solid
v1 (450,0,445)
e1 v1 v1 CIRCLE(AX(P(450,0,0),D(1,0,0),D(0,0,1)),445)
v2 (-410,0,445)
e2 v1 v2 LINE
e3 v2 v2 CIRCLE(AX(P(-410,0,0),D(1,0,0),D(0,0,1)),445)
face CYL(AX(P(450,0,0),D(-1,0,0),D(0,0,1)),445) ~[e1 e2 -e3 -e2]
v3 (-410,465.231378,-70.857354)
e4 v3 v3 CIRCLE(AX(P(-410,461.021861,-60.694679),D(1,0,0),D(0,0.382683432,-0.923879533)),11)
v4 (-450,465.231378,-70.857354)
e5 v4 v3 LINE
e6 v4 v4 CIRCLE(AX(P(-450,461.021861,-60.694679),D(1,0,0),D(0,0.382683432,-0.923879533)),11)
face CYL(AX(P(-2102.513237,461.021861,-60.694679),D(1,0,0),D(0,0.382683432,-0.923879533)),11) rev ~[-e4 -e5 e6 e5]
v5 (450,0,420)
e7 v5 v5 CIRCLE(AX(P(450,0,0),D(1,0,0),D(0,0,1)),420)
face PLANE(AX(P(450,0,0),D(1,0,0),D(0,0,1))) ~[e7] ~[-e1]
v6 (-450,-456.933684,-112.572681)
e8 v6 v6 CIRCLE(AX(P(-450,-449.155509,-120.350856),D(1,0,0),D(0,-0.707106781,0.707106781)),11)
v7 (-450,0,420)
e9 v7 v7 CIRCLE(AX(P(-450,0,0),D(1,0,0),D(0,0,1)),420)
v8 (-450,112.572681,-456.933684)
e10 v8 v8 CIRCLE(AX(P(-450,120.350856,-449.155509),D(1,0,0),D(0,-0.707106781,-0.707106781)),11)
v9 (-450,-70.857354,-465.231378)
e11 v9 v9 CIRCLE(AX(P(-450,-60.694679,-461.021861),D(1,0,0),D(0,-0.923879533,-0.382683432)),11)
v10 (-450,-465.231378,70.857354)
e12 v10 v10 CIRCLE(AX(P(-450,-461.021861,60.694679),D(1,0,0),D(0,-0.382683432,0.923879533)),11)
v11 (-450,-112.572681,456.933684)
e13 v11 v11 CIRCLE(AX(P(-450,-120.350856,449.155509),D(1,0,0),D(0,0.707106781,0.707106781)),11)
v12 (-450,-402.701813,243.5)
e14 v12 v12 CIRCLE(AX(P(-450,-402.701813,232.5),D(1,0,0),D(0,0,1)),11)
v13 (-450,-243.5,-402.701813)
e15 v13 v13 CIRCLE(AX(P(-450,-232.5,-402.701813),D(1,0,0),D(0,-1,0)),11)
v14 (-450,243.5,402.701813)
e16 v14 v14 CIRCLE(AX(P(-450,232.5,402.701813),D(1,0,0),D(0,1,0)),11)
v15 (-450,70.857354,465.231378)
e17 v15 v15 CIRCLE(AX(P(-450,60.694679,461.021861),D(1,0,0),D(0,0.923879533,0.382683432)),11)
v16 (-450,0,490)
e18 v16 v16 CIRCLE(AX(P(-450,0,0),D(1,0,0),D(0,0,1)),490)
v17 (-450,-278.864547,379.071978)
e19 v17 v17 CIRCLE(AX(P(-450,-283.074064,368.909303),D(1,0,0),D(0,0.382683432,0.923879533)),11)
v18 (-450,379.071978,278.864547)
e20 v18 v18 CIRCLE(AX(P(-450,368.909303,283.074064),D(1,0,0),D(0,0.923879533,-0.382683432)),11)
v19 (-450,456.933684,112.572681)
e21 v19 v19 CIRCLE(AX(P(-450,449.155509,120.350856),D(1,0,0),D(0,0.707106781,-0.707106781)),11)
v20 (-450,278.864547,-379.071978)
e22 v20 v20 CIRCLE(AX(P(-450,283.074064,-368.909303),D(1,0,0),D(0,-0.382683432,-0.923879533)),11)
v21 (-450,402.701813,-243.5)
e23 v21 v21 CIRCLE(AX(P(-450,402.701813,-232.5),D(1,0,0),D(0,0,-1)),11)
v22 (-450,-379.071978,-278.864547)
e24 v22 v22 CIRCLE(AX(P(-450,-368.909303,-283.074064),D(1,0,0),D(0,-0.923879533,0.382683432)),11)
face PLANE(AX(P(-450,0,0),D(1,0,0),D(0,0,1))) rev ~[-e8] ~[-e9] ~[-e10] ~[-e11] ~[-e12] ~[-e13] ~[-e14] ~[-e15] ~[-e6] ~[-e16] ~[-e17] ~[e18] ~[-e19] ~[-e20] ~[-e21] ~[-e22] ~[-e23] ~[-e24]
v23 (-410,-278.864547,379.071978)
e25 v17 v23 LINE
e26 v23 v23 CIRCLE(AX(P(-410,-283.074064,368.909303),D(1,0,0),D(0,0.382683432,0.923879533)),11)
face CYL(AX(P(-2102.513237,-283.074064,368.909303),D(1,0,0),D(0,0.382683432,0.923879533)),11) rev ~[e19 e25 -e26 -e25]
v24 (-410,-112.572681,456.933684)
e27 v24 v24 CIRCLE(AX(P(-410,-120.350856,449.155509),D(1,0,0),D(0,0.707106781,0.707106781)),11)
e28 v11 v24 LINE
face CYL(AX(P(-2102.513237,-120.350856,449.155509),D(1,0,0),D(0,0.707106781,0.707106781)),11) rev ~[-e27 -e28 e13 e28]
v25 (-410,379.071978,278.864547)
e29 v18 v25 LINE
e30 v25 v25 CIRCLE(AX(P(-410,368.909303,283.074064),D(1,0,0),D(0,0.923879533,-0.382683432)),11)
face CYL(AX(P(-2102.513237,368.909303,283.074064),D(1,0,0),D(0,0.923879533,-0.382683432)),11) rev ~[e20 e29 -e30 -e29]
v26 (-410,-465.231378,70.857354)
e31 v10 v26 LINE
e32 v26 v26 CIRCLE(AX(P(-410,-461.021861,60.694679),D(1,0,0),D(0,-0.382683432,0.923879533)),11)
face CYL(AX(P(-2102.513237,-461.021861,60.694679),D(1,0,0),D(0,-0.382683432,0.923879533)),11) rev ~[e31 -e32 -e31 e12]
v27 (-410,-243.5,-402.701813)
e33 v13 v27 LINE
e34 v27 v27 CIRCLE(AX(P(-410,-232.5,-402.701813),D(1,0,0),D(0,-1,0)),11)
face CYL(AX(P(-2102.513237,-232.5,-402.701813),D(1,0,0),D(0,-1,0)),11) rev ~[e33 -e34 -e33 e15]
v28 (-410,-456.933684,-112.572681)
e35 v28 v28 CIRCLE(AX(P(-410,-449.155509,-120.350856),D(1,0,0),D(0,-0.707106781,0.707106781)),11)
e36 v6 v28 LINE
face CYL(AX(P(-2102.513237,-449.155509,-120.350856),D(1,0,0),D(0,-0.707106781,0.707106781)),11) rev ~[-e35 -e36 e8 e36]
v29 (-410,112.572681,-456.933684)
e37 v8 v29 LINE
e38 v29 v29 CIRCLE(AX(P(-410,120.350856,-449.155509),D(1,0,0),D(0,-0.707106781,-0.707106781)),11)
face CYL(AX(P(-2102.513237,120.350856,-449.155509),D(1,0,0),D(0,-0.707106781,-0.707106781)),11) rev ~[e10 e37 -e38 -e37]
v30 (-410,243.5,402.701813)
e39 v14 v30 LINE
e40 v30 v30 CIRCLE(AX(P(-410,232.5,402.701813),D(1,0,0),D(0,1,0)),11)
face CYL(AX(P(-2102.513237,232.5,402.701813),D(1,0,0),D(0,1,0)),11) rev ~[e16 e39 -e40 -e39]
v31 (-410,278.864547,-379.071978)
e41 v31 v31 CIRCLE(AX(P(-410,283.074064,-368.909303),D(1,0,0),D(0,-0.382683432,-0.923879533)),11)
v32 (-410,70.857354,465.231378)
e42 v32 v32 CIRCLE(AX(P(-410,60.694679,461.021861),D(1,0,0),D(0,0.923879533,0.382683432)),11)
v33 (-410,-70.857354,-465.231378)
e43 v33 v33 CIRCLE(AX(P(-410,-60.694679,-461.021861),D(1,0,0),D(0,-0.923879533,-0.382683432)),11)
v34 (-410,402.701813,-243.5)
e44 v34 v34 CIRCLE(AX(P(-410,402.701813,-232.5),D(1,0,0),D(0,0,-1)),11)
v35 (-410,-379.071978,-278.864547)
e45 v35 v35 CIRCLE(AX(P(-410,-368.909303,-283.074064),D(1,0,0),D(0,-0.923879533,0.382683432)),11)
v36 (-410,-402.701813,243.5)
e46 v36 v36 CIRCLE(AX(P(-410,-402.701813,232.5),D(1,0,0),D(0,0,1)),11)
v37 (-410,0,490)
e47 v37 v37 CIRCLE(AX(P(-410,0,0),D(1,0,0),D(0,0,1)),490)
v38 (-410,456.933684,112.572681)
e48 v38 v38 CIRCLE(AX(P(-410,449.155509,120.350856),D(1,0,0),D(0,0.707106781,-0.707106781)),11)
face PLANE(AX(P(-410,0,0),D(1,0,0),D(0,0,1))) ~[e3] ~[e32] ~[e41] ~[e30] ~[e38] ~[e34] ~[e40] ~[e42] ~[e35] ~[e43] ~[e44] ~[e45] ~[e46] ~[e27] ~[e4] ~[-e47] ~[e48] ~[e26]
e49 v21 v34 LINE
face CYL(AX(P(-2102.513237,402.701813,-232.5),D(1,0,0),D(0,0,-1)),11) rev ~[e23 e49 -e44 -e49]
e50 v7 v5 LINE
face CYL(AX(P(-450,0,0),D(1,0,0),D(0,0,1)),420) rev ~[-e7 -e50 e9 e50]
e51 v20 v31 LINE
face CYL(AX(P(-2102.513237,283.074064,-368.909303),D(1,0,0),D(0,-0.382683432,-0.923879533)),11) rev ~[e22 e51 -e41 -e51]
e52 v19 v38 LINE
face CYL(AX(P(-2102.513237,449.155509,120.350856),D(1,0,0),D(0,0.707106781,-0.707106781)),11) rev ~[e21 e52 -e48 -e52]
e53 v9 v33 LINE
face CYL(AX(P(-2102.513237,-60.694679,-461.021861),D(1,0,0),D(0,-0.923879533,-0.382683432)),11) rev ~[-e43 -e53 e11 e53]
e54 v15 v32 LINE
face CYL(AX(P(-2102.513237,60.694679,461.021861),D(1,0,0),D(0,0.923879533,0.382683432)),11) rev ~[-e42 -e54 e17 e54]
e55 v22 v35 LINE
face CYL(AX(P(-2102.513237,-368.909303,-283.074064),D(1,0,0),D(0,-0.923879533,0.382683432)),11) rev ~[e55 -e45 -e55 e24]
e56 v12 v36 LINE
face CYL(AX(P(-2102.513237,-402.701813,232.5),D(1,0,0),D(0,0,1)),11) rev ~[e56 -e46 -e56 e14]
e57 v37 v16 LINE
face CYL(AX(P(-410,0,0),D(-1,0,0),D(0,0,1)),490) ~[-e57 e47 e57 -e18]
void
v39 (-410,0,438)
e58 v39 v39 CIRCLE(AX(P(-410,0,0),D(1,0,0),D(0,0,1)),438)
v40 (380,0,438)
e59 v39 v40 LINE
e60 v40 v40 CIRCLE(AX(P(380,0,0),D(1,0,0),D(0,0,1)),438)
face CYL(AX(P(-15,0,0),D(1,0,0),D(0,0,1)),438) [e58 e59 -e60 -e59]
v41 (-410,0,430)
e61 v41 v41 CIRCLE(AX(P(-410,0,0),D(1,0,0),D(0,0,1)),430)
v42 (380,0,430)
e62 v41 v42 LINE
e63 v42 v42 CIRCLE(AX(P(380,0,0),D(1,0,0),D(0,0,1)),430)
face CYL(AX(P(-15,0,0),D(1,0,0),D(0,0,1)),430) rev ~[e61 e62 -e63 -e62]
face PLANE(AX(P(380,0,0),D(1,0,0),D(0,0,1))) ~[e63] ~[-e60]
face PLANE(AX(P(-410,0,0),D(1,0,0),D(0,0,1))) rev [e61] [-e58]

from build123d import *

# Parameters (mm, degrees)
F0_W            = 790
F0_H            = 6
F2_W            = 790
F2_H            = 8
F5_D            = 22
F5_COPIES_COUNT = 16


# Not quite as in the source:
# - a pattern or mirror of a feature is missing from the dataset's text; its kind, count and spacing are read off the source's solid


with BuildPart() as f1:
    # F0 (on Front) → F1 (revolve)
    with BuildSketch(Plane.XZ):
        Polygon((-450, 490), (-450, 420), (450, 420), (450, 445), (-410, 445), (-410, 490), align=None)
        with Locations((-15, 435)):
            Rectangle(F0_W, F0_H, mode=Mode.SUBTRACT)
    revolve(axis=Axis((-71.5964585543, 0, 0), (1, 0, 0)))

    # F2 (on Front) → F3 (revolve, cut)
    with BuildSketch(Plane.XZ):
        with Locations((-15, 434)):
            Rectangle(F2_W, F2_H)
    revolve(axis=Axis((-160.7926189899, 0, 0), (1, 0, 0)), mode=Mode.SUBTRACT)

    # F5 (through all)
    with Locations(Plane(origin=(-450, 0, 0), x_dir=(0, -1, 0), z_dir=(-1, 0, 0))):
        with Locations((-232.5, 402.7018127598)):
            f5 = Hole(F5_D / 2)

    # F5_copies: F5 ×16 about axis
    f5_copies_axis = Axis((0, 0, 0), (1, 0, 0))
    for i in range(1, F5_COPIES_COUNT):
        add(f5.rotate(f5_copies_axis, i * 360 / F5_COPIES_COUNT), mode=Mode.SUBTRACT)


solid = f1.part
